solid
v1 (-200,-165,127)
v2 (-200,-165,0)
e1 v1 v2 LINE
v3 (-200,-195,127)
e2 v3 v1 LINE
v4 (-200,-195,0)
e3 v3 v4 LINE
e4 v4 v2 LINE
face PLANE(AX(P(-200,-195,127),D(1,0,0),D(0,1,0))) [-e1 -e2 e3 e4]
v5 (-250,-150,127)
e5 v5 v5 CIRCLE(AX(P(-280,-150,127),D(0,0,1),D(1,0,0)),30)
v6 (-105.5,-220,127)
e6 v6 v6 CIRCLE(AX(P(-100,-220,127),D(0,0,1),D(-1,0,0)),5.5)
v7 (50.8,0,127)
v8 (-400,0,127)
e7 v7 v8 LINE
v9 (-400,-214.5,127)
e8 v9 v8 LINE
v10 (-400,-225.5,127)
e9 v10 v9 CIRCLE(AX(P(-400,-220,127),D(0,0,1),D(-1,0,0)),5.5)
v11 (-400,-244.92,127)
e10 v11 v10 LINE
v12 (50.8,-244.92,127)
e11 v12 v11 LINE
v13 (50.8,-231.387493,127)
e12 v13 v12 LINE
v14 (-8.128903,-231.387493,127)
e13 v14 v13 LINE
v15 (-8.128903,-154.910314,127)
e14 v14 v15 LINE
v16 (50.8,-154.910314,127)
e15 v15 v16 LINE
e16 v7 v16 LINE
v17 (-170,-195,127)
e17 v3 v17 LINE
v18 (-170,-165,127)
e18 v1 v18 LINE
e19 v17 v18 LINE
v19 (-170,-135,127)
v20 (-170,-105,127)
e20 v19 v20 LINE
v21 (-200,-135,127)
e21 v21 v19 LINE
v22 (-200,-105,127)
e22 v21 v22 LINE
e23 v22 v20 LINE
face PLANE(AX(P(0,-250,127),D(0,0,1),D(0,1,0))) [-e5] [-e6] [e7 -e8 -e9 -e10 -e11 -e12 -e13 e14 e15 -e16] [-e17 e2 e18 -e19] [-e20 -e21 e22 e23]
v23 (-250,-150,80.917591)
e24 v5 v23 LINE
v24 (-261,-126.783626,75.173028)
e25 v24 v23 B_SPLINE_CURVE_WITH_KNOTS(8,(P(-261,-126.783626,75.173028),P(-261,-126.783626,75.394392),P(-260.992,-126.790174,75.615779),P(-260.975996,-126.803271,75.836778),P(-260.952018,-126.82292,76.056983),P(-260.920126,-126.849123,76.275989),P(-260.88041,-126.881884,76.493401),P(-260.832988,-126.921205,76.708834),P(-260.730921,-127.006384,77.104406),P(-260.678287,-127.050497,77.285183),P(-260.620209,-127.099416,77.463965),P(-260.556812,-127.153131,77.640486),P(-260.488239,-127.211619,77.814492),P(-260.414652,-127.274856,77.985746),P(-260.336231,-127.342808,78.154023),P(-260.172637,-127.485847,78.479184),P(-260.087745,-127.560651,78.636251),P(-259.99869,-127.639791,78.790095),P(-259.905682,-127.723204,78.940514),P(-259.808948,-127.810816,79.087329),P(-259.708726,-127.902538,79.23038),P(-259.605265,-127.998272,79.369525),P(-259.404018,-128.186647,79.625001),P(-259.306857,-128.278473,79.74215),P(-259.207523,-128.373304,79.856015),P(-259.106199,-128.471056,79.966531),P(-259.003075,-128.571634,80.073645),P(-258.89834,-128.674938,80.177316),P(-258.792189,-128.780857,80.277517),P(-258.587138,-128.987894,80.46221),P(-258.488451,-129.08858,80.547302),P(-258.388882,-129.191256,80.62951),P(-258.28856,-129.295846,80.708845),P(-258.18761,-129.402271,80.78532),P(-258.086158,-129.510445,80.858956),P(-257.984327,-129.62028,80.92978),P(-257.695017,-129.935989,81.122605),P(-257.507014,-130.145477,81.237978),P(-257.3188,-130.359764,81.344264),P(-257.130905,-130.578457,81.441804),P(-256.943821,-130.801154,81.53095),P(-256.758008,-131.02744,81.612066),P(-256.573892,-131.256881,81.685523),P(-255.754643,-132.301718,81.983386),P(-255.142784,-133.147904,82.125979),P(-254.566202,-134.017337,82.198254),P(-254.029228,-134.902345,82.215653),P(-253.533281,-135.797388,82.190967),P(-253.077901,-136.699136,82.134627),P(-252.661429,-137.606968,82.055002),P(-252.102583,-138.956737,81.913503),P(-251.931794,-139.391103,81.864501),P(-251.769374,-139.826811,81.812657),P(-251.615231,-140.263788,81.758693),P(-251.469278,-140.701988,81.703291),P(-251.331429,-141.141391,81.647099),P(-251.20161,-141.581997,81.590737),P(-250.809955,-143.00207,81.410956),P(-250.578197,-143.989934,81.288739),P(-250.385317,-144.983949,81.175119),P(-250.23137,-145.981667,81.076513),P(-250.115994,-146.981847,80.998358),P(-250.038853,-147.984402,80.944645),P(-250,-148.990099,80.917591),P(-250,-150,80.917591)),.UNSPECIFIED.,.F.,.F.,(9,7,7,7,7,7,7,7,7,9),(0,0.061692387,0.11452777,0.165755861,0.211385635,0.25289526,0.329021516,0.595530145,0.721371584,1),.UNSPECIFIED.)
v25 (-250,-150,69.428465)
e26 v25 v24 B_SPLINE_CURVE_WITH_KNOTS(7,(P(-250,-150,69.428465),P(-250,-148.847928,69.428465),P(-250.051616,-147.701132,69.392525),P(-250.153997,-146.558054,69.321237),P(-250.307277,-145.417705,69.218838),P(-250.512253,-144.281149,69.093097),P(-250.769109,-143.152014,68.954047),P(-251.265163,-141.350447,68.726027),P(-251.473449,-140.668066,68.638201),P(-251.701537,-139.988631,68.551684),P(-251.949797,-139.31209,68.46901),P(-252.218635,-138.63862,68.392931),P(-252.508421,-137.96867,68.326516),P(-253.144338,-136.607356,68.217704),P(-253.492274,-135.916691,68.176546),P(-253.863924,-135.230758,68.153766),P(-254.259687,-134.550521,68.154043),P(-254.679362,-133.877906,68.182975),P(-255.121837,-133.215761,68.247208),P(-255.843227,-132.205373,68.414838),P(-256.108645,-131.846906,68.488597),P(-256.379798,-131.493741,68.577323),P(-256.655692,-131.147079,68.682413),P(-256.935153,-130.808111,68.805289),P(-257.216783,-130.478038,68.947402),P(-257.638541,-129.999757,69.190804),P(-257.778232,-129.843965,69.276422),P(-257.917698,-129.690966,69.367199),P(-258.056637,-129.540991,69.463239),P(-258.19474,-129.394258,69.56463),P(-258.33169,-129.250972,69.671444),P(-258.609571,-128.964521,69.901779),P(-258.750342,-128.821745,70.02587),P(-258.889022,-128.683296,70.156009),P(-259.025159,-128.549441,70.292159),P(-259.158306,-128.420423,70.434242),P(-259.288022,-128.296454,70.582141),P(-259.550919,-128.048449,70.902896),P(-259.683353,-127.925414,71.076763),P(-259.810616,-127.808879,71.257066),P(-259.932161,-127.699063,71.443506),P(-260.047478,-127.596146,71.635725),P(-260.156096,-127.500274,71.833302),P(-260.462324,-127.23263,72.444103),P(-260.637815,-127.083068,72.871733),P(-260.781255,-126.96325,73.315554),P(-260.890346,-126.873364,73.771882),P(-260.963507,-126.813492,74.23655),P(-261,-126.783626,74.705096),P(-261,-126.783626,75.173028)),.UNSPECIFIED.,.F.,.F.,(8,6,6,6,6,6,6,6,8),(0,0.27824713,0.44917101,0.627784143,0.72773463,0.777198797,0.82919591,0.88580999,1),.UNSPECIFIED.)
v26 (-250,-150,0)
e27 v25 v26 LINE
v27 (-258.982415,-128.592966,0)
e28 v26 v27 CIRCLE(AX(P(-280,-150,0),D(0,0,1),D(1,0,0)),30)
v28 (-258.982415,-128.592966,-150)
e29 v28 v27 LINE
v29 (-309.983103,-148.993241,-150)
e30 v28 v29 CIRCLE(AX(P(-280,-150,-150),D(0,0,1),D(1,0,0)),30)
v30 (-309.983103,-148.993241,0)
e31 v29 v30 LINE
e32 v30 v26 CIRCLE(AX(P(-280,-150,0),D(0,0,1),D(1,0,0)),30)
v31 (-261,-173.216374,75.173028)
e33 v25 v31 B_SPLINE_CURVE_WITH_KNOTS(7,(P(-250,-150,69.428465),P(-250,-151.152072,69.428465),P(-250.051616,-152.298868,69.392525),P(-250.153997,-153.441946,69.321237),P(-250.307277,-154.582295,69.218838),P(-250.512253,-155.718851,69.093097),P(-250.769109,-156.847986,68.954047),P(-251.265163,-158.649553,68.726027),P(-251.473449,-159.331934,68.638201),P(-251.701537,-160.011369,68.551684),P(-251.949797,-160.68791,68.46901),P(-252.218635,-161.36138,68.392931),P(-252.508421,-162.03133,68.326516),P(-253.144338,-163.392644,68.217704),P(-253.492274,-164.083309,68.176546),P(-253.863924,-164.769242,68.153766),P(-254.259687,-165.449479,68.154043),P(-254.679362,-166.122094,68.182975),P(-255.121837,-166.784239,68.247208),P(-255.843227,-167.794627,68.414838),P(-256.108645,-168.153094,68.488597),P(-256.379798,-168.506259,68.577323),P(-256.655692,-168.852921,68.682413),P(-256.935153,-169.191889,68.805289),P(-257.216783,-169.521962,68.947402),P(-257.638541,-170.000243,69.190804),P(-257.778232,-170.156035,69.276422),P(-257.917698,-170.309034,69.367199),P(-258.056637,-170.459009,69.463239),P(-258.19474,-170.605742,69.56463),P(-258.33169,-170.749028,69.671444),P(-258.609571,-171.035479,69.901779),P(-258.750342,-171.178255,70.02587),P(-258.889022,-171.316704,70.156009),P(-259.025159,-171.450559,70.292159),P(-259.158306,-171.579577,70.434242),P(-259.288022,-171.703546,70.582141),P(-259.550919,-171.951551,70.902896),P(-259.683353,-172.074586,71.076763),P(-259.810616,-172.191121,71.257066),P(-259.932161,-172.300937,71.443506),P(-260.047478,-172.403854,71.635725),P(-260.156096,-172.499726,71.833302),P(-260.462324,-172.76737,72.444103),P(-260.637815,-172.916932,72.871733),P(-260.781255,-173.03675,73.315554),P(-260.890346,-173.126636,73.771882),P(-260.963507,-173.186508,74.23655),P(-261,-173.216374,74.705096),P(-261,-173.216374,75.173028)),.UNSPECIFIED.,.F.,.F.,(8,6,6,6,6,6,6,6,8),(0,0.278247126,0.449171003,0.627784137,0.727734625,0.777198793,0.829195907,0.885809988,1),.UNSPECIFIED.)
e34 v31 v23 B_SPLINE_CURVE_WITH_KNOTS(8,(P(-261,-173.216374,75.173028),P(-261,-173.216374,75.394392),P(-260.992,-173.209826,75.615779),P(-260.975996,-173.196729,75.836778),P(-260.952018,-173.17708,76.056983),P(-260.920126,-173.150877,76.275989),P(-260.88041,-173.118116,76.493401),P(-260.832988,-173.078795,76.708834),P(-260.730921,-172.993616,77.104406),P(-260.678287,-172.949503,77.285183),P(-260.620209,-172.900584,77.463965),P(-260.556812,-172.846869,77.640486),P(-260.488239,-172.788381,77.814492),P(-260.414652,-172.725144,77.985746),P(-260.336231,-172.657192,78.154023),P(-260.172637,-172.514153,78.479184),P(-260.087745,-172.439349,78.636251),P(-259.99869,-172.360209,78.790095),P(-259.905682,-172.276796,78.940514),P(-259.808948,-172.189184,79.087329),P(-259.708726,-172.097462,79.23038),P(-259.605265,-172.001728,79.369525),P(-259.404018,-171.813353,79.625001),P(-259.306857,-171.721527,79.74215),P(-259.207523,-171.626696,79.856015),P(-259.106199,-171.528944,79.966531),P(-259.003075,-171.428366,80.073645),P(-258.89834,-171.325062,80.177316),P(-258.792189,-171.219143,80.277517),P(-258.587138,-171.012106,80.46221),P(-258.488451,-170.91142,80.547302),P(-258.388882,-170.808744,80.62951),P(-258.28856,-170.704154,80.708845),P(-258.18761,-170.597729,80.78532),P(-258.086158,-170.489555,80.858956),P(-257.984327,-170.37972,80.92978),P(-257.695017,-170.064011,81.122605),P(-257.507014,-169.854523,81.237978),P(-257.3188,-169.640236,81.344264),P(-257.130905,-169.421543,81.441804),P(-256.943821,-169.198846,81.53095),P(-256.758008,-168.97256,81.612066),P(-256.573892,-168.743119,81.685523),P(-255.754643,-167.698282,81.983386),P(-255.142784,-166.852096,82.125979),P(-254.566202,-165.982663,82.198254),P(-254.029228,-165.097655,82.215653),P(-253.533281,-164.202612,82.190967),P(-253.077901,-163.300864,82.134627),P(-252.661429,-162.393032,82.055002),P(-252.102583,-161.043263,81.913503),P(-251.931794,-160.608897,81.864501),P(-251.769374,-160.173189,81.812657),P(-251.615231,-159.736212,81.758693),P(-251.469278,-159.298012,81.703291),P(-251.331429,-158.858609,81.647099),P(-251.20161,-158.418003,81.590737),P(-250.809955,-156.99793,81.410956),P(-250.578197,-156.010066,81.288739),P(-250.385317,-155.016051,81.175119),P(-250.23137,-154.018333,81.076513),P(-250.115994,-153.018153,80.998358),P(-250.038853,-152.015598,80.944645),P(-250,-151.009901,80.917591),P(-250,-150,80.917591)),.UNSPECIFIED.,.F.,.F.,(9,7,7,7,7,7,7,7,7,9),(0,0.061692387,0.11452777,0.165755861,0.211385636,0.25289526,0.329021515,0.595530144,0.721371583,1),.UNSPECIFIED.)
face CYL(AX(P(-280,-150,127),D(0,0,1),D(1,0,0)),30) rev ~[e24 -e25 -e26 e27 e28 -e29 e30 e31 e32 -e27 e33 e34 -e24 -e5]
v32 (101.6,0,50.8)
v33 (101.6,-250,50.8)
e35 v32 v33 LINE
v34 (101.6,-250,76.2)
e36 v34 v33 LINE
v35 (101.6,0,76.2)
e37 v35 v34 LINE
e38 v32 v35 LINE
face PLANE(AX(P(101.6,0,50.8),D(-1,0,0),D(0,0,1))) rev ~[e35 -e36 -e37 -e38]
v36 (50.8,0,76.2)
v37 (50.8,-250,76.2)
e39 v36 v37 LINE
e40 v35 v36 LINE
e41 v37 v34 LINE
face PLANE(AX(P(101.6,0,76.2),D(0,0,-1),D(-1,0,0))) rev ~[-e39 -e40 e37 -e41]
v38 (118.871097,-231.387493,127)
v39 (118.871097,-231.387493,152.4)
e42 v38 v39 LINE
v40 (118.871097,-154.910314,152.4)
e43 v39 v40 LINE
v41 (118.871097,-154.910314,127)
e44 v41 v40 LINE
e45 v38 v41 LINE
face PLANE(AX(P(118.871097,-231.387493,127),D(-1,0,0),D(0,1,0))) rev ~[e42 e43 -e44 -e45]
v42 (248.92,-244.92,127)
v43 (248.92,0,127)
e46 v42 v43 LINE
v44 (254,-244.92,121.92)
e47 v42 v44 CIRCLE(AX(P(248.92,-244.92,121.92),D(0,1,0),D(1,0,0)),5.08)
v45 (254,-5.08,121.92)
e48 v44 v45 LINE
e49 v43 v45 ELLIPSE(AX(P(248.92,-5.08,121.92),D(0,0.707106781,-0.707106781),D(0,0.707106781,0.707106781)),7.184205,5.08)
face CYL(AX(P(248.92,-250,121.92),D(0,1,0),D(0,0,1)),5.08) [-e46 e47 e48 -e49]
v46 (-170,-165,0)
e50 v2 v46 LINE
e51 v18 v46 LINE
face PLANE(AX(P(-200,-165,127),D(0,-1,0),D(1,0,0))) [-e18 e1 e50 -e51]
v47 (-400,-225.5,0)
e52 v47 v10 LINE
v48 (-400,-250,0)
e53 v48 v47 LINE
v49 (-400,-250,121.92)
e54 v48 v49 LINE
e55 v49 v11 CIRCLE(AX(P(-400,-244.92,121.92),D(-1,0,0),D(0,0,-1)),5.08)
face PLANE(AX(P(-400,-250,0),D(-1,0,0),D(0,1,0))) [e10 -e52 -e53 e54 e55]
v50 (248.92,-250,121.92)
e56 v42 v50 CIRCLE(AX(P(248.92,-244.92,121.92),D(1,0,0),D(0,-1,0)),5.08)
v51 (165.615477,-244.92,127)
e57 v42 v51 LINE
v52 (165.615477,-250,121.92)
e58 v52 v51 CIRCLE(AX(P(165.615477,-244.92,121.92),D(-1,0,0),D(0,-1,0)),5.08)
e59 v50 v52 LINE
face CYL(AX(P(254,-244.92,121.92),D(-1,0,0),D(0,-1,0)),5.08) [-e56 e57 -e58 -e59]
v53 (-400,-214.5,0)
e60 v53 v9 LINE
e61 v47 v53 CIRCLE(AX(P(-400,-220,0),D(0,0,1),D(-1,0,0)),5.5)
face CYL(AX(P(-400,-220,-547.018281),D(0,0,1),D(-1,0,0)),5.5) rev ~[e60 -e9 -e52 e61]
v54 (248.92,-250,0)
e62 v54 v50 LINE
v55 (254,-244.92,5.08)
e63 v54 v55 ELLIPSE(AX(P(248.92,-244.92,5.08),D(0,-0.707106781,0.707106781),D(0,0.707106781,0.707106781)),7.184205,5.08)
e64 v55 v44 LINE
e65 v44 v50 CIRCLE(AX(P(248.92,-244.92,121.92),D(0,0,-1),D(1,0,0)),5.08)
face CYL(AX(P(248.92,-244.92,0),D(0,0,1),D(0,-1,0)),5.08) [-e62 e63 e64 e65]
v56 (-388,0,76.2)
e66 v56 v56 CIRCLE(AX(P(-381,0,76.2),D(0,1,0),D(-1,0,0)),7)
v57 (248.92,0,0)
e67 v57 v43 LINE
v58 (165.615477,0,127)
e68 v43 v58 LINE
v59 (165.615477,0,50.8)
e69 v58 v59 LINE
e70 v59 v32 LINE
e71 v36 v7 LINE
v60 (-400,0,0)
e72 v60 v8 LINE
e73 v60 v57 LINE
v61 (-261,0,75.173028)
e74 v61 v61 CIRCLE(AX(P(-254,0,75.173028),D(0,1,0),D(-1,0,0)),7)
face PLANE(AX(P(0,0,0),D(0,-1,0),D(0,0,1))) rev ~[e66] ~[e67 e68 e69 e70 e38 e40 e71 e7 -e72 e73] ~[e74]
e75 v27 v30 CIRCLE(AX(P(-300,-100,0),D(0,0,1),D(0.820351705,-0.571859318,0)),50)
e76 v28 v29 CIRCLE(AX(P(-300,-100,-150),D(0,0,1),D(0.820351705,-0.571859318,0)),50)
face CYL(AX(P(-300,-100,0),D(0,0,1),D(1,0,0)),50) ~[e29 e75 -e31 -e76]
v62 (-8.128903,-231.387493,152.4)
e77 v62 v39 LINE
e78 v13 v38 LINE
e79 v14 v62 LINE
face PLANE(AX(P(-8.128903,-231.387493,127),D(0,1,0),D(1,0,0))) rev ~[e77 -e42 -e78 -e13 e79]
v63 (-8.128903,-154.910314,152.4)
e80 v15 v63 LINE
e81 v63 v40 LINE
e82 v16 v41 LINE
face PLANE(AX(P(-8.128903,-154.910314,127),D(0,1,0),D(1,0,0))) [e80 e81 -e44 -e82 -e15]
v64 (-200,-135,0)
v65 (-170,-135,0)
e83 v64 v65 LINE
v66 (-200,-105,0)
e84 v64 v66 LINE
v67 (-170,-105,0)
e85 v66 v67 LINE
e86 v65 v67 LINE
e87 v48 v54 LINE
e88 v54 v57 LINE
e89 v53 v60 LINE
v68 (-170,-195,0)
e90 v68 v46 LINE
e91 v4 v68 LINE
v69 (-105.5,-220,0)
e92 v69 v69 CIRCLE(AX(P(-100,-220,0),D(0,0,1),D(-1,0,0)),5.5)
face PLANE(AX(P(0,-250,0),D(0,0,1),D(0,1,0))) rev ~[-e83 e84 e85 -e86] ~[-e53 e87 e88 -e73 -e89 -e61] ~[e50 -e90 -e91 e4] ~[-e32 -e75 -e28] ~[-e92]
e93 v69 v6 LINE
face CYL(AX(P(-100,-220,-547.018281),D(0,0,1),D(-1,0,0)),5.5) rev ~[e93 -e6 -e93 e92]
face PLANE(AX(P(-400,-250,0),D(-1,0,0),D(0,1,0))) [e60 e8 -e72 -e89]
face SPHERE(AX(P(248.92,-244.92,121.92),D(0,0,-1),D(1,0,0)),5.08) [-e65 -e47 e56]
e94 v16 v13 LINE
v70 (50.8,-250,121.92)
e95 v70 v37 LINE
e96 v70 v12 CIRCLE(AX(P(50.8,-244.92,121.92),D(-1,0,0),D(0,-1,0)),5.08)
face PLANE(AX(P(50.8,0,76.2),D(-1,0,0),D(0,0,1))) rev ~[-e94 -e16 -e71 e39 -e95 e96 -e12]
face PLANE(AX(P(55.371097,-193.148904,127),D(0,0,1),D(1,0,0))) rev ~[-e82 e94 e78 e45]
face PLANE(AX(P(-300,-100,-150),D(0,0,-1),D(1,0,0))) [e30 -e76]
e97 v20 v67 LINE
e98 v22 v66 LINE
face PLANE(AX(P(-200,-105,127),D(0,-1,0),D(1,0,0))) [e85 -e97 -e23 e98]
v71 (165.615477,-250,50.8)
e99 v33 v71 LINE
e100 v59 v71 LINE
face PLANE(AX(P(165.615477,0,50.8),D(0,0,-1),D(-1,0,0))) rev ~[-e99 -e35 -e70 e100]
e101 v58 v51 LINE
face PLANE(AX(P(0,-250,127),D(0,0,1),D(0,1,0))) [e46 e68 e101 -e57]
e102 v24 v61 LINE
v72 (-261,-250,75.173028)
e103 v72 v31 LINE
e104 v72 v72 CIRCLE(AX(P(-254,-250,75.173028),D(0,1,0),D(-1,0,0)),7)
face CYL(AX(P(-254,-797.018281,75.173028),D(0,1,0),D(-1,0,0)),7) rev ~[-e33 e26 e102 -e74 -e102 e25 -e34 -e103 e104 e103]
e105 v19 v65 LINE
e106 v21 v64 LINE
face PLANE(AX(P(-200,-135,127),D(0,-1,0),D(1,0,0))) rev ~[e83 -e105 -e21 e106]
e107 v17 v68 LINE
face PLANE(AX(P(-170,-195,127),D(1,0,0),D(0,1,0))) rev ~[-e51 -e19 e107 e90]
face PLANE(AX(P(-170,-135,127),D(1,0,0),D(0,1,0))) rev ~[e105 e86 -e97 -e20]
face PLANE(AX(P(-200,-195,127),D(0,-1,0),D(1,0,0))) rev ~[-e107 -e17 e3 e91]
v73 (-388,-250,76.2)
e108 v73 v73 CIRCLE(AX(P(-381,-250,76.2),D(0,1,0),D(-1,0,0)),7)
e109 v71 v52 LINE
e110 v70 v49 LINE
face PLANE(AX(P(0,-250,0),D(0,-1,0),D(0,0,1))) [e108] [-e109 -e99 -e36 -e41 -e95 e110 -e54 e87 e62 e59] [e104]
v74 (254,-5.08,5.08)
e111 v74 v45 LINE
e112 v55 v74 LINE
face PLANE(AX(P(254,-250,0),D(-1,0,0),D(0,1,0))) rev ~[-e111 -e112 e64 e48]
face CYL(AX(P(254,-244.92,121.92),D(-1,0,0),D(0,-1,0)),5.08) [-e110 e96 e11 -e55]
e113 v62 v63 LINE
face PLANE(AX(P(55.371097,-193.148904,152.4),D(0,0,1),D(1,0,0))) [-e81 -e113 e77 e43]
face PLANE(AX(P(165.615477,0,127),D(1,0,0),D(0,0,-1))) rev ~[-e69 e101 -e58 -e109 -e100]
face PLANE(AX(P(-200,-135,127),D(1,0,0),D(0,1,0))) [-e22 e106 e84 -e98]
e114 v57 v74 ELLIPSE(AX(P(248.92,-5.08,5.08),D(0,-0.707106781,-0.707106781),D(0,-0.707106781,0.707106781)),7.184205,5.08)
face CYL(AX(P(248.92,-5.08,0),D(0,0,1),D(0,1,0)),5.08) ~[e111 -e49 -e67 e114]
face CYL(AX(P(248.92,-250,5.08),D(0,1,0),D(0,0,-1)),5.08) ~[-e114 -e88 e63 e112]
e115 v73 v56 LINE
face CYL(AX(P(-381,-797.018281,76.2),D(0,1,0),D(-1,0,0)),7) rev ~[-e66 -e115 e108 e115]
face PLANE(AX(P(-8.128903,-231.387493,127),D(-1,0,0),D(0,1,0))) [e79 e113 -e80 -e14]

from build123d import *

# Parameters (mm, degrees)
F0_W      = 400
F0_H      = 250
F1_DEPTH  = 127
F2_R      = 50
F3_DEPTH  = 150
F5_D      = 11
F7_D      = 14
F8_DEPTH  = 254
F9_R      = 5.08
F11_DEPTH = 250.001
F12_W     = 127
F12_H     = 76.4771783382
F13_DEPTH = 25.4
F14_W     = 30
F14_H     = 30
F14_R     = 30
F15_DEPTH = 277.001


with BuildPart() as f1:
    # F0 (on Top) → F1 (new body)
    with BuildSketch(Plane.XY):
        with Locations((-200, -125)):
            Rectangle(F0_W, F0_H)
    extrude(amount=F1_DEPTH)

    # F2 (on face) → F3 (join)
    with BuildSketch(Plane(origin=(0, 0, 0), x_dir=(1, 0, 0), z_dir=(0, 0, -1))):
        with Locations((-300, 100)):
            Circle(F2_R)
    extrude(amount=F3_DEPTH)

    # F5 (through all)
    with Locations(Plane(origin=(0, 0, 0), x_dir=(1, 0, 0), z_dir=(0, 0, -1))):
        with Locations((-400, 220), (-100, 220)):
            Hole(F5_D / 2)

    # F7 (through all)
    with Locations(Plane.XZ.offset(250)):
        with Locations((-381, 76.2), (-254, 75.1730280948)):
            Hole(F7_D / 2)

    # F8 (add): a face of the model
    f8_faces = [f1.faces().sort_by_distance(p)[0] for p in [
        (0, -125, 63.5),
    ]]
    extrude(f8_faces, amount=F8_DEPTH)

    # F9
    f9_edges = [f1.edges().sort_by_distance(p)[0] for p in [
        (254, -250, 63.5),
        (254, 0, 63.5),
        (254, -125, 0),
        (254, -125, 127),
        (-73, -250, 127),
    ]]
    fillet(f9_edges, radius=F9_R)

    # F10 (on face) → F11 (cut, through all)
    with BuildSketch(Plane(origin=(0, 0, 0), x_dir=(-1, 0, 0), z_dir=(0, 1, 0))):
        Polygon((-50.8, 127), (-165.6154772818, 127), (-165.6154772818, 50.8), (-101.6, 50.8), (-101.6, 76.2), (-50.8, 76.2), align=None)
    extrude(amount=-F11_DEPTH, mode=Mode.SUBTRACT)

    # F12 (on face) → F13 (join)
    with BuildSketch(Plane.XY.offset(127)):
        with Locations((55.3710968234, -193.1489035487)):
            Rectangle(F12_W, F12_H)
    extrude(amount=F13_DEPTH)

    # F14 (on face) → F15 (cut, through all)
    with BuildSketch(Plane.XY.offset(127)):
        with Locations((-185, -120)):
            Rectangle(F14_W, F14_H)
        with Locations((-185, -180)):
            Rectangle(F14_W, F14_H)
        with Locations((-280, -150)):
            Circle(F14_R)
    extrude(amount=-F15_DEPTH, mode=Mode.SUBTRACT)


solid = f1.part
